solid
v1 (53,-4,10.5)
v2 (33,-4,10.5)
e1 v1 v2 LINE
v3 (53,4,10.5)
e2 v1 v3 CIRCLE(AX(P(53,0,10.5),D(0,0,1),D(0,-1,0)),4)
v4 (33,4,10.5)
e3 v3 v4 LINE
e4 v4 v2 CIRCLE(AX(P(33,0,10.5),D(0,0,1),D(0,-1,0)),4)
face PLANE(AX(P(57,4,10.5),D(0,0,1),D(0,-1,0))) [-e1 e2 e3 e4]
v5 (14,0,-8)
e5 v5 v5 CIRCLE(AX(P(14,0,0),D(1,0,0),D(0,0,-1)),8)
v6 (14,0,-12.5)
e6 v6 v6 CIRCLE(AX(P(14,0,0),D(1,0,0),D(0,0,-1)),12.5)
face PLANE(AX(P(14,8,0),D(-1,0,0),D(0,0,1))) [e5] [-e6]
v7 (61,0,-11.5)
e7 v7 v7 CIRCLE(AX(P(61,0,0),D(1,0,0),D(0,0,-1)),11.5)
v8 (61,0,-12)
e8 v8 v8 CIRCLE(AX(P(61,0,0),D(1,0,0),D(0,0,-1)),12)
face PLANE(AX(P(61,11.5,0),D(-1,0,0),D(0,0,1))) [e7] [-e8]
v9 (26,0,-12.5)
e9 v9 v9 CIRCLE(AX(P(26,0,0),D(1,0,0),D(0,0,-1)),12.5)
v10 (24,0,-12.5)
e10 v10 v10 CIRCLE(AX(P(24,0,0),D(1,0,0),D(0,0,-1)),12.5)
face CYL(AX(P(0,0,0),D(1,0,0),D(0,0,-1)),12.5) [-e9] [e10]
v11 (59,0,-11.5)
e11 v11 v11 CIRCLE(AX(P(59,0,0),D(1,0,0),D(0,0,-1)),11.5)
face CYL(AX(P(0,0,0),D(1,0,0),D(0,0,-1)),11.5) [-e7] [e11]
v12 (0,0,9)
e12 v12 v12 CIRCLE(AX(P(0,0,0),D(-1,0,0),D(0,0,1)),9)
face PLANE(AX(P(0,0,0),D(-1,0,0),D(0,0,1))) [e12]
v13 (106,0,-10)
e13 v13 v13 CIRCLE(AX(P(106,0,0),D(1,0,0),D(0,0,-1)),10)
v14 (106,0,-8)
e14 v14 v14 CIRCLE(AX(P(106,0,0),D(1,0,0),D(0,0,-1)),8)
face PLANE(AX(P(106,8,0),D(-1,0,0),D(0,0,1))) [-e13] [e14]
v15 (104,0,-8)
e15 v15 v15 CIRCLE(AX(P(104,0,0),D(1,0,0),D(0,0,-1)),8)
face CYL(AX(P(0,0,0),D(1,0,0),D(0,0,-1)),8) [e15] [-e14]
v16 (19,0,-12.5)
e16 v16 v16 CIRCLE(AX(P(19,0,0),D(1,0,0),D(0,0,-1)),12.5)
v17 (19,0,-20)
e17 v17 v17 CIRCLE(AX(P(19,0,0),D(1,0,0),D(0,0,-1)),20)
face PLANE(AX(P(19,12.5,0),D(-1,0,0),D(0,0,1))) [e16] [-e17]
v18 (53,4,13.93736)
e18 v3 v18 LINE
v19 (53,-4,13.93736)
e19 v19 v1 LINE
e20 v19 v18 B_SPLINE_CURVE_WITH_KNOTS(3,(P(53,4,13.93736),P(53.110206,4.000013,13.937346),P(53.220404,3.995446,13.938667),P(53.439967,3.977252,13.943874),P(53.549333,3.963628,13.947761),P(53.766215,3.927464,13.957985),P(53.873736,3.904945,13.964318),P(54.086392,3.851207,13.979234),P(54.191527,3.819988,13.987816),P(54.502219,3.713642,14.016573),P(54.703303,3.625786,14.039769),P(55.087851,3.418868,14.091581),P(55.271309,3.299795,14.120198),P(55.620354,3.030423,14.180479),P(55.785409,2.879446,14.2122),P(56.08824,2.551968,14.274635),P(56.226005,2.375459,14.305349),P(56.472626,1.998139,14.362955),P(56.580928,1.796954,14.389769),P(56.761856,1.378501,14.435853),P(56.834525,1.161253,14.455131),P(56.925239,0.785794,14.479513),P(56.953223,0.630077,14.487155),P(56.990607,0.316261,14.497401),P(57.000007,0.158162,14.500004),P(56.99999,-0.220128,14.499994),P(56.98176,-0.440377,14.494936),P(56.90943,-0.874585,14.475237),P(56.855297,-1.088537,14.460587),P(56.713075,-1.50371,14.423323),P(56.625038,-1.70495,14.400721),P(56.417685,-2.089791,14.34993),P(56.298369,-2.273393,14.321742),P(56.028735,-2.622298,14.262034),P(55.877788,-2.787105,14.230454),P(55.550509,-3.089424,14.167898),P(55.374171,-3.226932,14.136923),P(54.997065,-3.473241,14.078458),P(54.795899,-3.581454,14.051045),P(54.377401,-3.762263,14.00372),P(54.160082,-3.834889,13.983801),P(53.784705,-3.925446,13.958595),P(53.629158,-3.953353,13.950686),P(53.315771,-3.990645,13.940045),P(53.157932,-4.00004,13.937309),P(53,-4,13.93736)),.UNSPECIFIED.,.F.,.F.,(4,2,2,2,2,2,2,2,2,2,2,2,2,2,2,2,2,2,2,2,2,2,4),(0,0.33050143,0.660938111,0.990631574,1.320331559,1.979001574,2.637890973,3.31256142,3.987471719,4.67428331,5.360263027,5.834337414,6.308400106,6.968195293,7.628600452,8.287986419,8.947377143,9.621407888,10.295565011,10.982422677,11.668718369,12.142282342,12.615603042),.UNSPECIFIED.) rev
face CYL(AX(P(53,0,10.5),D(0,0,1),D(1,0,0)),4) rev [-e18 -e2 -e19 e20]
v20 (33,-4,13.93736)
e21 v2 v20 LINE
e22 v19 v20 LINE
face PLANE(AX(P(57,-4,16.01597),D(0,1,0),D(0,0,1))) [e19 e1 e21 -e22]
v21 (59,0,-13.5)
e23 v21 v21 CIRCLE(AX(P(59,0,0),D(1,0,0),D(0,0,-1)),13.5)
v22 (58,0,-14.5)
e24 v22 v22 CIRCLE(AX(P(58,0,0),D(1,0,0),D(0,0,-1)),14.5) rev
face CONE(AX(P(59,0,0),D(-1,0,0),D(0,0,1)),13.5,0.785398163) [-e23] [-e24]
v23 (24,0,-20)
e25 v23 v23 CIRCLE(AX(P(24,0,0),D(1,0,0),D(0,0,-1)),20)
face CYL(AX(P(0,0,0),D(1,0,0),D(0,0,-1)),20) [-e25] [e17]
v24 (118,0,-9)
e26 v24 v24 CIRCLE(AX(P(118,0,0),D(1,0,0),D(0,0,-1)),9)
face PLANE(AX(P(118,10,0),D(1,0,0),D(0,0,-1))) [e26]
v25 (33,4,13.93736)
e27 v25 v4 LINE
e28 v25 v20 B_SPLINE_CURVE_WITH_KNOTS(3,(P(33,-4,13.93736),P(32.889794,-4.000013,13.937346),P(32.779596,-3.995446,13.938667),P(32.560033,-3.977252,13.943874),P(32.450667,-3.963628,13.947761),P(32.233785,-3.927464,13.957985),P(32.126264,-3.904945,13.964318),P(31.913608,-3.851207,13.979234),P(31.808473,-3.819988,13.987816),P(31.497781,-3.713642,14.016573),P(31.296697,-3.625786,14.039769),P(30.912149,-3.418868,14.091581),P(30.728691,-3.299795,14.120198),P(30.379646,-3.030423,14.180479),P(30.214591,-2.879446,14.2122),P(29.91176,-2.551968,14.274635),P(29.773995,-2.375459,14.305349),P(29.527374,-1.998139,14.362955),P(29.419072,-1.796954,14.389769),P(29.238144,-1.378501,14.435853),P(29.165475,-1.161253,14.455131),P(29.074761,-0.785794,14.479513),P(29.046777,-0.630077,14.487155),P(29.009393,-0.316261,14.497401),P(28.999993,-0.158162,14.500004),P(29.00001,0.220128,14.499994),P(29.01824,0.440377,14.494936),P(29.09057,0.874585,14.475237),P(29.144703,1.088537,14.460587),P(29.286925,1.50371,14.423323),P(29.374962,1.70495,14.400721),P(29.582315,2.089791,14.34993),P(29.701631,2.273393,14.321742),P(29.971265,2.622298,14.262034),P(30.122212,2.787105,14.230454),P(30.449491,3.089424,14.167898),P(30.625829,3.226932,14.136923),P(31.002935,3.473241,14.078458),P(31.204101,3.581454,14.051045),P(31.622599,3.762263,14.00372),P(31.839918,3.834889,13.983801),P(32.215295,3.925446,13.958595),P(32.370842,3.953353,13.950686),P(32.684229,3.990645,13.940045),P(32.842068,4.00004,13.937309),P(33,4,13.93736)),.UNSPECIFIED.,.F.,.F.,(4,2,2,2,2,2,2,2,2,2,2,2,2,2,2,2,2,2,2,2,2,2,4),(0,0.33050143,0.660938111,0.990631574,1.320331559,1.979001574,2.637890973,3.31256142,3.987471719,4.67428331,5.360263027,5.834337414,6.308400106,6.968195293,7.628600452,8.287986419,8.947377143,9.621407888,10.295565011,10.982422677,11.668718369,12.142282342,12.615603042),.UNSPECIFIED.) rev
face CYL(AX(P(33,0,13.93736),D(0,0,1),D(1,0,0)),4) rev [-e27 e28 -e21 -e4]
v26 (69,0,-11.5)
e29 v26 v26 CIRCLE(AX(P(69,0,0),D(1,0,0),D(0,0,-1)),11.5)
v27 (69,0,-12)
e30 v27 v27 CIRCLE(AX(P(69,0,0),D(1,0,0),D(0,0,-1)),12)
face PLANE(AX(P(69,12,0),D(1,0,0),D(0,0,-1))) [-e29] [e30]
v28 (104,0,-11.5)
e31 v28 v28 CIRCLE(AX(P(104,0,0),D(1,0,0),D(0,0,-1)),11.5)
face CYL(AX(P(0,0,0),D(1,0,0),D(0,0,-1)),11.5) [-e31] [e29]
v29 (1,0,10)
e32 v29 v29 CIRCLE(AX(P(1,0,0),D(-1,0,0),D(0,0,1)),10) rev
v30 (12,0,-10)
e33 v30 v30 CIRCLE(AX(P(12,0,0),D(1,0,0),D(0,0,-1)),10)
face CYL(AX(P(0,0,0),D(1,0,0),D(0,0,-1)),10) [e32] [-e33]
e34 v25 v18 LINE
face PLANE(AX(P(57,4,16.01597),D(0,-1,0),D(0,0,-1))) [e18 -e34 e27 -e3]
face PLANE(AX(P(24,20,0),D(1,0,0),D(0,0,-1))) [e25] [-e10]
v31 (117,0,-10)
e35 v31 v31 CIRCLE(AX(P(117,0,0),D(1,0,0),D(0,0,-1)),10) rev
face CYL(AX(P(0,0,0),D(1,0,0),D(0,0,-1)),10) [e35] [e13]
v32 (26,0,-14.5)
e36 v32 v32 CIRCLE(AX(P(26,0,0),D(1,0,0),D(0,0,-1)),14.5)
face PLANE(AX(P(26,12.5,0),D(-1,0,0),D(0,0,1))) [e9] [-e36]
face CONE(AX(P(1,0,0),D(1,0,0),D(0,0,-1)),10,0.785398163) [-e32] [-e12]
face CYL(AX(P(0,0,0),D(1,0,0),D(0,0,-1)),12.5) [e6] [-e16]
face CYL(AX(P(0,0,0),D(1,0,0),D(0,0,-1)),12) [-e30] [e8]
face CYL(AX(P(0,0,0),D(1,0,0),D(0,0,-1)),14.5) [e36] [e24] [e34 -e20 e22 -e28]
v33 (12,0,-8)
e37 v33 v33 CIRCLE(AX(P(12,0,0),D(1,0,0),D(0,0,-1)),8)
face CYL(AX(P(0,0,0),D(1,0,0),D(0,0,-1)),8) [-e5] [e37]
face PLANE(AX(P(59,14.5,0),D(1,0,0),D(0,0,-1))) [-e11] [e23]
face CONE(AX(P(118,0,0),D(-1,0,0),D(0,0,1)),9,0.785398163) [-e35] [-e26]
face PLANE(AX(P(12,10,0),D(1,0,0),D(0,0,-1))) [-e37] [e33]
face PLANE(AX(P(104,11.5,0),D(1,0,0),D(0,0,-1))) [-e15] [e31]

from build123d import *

# Parameters (mm, degrees)
CHAMFER_1_SIZE      = 1
SKETCH_2_W          = 5.515970317
SKETCH_2_H          = 8
CUT_EXTRUDE_1_DEPTH = 28
FILLET_1_R          = 4
FILLET_2_R          = 4


with BuildPart() as part:
    # 草图1 → 旋转1 (revolve)
    with BuildSketch(Plane.XY, mode=Mode.PRIVATE) as revolve_1_sk:
        Polygon((0, 0), (0, 10), (12, 10), (12, 8), (14, 8), (14, 12.5), (19, 12.5), (19, 20), (24, 20), (24, 12.5), (26, 12.5), (26, 14.5), (59, 14.5), (59, 11.5), (61, 11.5), (61, 12), (69, 12), (69, 11.5), (104, 11.5), (104, 8), (106, 8), (106, 10), (118, 10), (118, 0), align=None)
    revolve(revolve_1_sk.sketch.rotate(Axis((0, 0, 0), (-1, 0, 0)), 90), axis=Axis((0, 0, 0), (-1, 0, 0)))

    # 倒角1
    chamfer_1_edges = [part.edges().sort_by_distance(p)[0] for p in [
        (118, 0, 10),
        (59, 0, 14.5),
        (0, 0, 10),
    ]]
    chamfer(chamfer_1_edges, length=CHAMFER_1_SIZE)

    # 草图2 → 切除-拉伸1 (cut)
    with BuildSketch(Plane(origin=(29, 0, 0), x_dir=(0, 0, -1), z_dir=(1, 0, 0))):
        with Locations((-13.257985159, 0)):
            Rectangle(SKETCH_2_W, SKETCH_2_H)
    extrude(amount=CUT_EXTRUDE_1_DEPTH, mode=Mode.SUBTRACT)

    # 圆角1
    fillet_1_edges = [part.edges().sort_by_distance(p)[0] for p in [
        (29, 4, 12.218679932),
        (29, -4, 12.218679932),
    ]]
    fillet(fillet_1_edges, radius=FILLET_1_R - 0.0001)  # a hair under: the kernel refuses the full size

    # 圆角2
    fillet_2_edges = [part.edges().sort_by_distance(p)[0] for p in [
        (57, -4, 12.218679932),
        (57, 4, 12.218679932),
    ]]
    fillet(fillet_2_edges, radius=FILLET_2_R - 0.0001)  # a hair under: the kernel refuses the full size


solid = part.part
